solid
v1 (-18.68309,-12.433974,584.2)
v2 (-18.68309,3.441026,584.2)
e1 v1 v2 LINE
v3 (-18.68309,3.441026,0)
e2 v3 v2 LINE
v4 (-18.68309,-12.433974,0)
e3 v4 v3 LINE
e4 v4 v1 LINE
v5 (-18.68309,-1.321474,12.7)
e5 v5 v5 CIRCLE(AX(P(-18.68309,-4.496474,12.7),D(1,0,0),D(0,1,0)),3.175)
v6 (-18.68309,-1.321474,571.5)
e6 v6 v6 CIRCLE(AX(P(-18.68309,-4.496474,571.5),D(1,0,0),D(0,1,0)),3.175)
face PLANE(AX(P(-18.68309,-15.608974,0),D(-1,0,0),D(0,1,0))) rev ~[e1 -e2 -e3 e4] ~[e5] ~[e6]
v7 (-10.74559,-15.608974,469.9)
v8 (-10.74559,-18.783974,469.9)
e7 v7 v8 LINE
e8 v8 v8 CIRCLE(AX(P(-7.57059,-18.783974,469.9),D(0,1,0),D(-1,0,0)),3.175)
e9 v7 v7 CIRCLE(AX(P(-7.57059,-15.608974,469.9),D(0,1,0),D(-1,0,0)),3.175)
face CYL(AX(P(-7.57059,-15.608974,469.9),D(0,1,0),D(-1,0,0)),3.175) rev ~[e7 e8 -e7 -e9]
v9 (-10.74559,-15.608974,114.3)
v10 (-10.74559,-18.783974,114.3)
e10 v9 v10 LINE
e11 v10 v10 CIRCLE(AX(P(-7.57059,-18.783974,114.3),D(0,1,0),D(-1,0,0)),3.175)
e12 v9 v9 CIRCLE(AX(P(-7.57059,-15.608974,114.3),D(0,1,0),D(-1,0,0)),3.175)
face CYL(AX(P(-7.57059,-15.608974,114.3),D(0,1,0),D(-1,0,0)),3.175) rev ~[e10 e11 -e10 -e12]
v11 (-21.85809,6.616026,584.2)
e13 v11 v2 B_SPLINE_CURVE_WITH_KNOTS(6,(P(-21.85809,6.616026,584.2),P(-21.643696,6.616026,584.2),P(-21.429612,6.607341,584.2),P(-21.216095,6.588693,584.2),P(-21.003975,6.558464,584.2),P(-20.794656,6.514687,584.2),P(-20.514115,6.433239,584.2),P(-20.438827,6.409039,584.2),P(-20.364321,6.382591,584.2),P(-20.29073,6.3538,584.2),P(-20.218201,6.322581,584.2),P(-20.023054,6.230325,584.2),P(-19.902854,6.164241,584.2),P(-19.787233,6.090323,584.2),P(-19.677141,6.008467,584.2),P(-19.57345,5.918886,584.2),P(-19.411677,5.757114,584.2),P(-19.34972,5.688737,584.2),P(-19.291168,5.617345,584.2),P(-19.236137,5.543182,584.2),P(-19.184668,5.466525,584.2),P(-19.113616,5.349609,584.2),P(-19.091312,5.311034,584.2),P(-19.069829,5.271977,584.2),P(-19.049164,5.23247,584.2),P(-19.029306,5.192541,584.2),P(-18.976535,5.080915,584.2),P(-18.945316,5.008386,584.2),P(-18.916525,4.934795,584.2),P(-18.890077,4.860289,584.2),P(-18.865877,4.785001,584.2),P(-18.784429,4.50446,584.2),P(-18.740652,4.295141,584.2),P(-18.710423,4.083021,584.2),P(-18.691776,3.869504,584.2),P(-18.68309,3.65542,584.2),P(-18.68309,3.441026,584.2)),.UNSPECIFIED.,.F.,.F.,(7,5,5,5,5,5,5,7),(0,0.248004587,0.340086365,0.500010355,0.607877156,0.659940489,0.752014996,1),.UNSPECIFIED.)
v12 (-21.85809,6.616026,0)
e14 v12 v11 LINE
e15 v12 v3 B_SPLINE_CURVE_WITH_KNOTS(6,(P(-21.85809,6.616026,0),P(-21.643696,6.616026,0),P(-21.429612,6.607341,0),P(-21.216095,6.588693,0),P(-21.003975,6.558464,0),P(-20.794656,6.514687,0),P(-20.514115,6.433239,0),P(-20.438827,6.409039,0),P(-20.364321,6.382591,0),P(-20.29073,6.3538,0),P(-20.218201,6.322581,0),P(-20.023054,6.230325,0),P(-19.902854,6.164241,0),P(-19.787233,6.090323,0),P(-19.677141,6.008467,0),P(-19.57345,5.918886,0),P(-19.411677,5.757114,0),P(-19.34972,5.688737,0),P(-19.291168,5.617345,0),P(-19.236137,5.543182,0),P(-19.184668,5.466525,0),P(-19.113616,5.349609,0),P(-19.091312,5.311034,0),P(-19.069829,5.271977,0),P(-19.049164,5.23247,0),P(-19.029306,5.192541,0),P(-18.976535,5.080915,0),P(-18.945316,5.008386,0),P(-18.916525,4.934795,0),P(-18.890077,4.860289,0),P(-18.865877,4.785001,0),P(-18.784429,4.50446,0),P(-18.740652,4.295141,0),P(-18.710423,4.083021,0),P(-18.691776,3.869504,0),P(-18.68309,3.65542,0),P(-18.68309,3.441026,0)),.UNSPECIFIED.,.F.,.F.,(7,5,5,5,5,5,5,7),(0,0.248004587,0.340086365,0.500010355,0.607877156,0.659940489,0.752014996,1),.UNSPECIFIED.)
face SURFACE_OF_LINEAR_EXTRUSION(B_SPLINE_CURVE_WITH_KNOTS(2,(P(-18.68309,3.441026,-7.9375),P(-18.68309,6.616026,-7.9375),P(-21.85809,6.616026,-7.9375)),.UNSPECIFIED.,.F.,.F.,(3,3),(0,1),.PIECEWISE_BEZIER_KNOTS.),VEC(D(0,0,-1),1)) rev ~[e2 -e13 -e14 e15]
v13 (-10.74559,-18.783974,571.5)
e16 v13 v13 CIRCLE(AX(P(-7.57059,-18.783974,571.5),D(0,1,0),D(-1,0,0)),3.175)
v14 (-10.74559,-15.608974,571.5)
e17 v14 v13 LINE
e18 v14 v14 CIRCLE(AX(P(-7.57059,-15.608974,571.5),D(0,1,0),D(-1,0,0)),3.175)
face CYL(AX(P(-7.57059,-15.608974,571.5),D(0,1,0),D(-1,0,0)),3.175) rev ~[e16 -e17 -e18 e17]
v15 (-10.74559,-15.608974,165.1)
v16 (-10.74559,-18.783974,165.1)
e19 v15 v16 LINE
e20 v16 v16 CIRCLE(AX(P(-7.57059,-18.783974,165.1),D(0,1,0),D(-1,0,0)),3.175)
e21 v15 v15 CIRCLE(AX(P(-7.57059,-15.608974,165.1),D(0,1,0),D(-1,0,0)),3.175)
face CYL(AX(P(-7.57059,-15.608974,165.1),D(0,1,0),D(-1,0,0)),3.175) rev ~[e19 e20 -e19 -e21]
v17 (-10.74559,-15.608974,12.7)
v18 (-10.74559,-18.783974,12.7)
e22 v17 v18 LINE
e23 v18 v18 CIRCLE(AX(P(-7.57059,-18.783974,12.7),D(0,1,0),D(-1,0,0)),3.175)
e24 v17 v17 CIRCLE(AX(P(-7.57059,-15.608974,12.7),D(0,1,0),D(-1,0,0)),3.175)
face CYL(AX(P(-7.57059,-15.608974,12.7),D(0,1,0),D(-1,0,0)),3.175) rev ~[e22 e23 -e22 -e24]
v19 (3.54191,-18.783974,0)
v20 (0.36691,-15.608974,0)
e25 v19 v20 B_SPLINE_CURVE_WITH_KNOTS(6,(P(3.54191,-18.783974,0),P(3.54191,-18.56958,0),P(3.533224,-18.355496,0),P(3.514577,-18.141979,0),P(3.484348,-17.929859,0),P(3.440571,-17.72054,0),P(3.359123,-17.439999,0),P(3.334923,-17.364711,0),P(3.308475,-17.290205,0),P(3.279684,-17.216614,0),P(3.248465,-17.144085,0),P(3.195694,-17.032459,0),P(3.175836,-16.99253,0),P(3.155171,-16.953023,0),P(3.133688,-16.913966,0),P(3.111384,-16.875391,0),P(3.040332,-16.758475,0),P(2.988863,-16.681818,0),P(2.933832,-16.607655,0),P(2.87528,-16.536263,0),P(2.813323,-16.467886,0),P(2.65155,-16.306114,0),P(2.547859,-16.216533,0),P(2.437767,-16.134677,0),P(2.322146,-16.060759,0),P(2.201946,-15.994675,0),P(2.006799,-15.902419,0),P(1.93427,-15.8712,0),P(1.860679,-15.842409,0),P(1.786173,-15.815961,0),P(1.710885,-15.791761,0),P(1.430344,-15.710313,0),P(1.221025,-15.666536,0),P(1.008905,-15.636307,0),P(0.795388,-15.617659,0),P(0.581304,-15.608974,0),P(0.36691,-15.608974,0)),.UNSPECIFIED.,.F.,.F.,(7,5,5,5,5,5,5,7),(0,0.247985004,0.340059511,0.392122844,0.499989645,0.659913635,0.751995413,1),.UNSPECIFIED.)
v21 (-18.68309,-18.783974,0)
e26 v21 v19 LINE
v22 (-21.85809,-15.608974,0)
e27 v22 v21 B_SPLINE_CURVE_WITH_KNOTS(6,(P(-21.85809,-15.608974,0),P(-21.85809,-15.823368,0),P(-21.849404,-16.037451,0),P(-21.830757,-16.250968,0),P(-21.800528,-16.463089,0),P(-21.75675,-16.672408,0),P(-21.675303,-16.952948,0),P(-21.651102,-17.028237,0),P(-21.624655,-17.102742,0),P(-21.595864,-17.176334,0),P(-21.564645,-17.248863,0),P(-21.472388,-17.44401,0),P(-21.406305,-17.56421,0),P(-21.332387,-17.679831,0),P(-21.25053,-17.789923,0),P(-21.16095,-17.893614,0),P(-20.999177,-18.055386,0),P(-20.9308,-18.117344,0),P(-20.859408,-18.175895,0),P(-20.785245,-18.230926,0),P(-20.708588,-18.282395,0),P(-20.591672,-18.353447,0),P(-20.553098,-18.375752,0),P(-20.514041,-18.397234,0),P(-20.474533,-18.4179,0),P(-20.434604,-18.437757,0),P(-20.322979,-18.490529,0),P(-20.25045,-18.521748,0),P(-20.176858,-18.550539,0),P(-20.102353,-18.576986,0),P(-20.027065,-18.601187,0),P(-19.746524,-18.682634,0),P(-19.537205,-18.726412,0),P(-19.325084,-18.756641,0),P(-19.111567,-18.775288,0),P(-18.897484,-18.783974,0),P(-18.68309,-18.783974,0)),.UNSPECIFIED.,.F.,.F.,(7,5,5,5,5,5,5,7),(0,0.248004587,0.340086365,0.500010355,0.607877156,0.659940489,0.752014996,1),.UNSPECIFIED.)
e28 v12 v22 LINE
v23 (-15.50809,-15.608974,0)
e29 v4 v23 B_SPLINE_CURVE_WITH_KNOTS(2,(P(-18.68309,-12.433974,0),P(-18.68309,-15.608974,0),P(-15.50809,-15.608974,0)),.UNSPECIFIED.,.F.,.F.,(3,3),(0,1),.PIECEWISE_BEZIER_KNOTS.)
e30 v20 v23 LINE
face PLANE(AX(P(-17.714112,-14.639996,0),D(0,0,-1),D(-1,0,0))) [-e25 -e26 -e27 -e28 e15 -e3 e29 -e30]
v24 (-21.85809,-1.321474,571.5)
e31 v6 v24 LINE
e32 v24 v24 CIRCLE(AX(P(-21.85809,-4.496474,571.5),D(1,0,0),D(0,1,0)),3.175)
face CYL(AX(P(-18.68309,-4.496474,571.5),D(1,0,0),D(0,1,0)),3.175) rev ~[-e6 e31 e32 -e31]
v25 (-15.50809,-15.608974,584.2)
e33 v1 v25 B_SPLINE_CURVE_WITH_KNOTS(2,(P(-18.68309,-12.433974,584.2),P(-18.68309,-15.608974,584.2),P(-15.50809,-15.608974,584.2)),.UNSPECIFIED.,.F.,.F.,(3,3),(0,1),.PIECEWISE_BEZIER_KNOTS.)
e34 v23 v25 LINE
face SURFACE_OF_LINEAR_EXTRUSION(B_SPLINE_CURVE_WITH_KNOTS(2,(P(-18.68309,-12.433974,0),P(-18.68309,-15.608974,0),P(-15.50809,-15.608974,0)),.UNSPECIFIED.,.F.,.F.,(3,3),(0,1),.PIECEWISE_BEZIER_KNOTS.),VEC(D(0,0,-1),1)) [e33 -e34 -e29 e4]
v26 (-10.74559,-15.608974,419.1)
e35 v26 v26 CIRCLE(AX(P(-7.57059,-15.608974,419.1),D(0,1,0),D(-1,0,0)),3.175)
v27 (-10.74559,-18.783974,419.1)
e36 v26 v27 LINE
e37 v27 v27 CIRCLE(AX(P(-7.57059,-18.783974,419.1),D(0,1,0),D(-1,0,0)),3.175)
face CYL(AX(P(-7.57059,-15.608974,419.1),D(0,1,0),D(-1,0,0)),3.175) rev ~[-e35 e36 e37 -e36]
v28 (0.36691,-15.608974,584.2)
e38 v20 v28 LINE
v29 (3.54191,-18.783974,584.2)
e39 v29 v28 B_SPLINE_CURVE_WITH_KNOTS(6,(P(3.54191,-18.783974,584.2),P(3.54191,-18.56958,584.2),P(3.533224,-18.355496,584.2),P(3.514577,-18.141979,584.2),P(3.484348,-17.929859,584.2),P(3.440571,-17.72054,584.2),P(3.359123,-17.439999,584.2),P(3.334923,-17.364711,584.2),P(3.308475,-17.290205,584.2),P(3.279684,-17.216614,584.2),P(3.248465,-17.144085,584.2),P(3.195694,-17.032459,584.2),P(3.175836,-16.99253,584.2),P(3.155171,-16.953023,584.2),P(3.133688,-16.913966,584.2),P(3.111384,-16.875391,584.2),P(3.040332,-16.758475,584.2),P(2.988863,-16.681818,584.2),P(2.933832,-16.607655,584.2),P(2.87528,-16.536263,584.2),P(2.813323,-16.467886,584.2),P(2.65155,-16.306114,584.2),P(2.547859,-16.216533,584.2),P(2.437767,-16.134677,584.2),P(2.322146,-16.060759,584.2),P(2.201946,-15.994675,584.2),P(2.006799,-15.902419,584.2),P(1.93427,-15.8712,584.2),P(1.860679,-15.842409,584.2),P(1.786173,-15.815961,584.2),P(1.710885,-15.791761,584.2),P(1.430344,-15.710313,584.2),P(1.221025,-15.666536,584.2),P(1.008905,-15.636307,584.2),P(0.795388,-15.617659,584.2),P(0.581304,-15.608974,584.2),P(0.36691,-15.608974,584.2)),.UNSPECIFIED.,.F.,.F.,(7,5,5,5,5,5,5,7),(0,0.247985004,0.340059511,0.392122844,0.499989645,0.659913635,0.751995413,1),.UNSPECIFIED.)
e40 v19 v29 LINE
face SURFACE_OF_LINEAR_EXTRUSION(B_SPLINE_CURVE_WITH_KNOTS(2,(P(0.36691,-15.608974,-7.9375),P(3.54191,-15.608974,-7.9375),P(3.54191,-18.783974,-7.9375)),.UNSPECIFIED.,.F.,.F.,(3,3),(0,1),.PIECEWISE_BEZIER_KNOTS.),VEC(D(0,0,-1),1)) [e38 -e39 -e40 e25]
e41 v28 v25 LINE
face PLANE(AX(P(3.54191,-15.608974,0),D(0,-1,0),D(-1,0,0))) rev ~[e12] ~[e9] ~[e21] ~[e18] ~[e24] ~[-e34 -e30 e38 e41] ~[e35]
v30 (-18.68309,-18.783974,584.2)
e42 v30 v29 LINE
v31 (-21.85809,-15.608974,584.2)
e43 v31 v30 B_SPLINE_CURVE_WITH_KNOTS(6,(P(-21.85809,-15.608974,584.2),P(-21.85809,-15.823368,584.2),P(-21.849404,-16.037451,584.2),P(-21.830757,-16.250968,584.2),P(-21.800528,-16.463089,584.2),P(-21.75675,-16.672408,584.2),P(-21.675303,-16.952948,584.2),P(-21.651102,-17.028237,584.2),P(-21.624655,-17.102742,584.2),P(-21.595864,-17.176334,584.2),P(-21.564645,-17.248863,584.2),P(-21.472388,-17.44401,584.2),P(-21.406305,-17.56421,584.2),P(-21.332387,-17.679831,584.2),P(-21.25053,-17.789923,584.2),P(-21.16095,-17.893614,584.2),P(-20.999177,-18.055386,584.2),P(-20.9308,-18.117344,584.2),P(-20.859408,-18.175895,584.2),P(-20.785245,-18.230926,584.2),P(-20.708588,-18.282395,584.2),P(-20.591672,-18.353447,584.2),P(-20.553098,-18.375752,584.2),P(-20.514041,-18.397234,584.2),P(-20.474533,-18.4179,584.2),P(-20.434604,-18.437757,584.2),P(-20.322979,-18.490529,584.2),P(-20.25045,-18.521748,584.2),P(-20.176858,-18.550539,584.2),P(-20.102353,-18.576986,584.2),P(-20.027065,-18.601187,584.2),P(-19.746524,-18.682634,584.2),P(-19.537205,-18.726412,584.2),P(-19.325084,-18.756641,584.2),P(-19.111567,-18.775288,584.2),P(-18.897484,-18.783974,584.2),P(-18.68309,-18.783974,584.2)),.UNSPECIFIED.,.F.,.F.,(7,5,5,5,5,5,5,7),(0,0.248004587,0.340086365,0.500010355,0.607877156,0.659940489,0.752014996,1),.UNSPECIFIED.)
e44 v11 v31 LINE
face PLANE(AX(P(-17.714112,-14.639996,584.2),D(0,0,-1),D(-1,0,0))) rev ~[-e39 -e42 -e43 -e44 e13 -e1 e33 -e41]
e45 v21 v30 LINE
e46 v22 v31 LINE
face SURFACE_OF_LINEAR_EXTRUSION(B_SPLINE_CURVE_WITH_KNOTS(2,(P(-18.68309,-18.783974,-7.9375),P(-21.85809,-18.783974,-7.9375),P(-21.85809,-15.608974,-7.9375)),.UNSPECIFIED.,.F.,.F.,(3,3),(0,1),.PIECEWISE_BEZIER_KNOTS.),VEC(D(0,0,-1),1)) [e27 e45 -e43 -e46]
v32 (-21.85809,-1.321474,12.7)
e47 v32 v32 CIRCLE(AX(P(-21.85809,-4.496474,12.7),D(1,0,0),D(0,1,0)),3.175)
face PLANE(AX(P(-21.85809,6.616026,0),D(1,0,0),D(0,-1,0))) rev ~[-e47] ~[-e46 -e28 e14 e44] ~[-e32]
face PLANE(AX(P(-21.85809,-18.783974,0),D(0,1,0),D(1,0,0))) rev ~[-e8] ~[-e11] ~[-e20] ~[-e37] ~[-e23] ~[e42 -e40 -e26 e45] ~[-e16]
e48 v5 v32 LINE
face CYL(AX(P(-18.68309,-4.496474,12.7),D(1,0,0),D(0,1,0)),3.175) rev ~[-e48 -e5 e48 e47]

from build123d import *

# Parameters (mm, degrees)
F1_DEPTH    = 584.2
F2_R        = 3.175
F3_DEPTH    = 3.175
F4_R        = 3.175
F5_DEPTH    = 25.4
F6_T1_DEPTH = 600.075
F7_T1_DEPTH = 584.2
F7_T3_DEPTH = 600.075
F8_R        = 3.175
F9_DEPTH    = 3.175


# Not quite as in the source:
# - a fillet or chamfer that OpenCascade refuses, or shapes differently, is made with other operations: its cross-section is extruded or revolved along the edge and cut away or added


with BuildPart() as f1:
    # F0 (on Top) → F1 (new body)
    with BuildSketch(Plane.XY):
        Polygon((-18.6830897415, 6.6160263166), (-21.8580897415, 6.6160263166), (-21.8580897415, -18.7839736834), (3.5419102585, -18.7839736834), (3.5419102585, -15.6089736834), (-18.6830897415, -15.6089736834), align=None)
    extrude(amount=F1_DEPTH)

    # F2 (on face) → F3 (cut)
    with BuildSketch(Plane.YZ.offset(-18.6830897415)):
        with Locations((-4.4964736834, 571.5)):
            Circle(F2_R)
        with Locations((-4.4964736834, 12.7)):
            Circle(F2_R)
    extrude(amount=-F3_DEPTH, mode=Mode.SUBTRACT)

    # F4 (on face) → F5 (cut)
    with BuildSketch(Plane(origin=(0, -15.6089736834, 0), x_dir=(-1, 0, 0), z_dir=(0, 1, 0))):
        with Locations((7.5705897415, 12.7)):
            Circle(F4_R)
        with Locations((7.5705897415, 571.5)):
            Circle(F4_R)
    extrude(amount=-F5_DEPTH, mode=Mode.SUBTRACT)

    # F6: fillet of radius 3.175 on 2 edges, made by hand

    # F6_s2 → F6_t1 (cut)
    with BuildSketch(Plane.XY.offset(-7.9375)):
        with BuildLine():
            add(Edge.make_bspline(
                [(0.3669102585, -15.6089736834), (3.5419102585, -15.6089736834), (3.5419102585, -18.7839736834)],
                knots=[0, 0, 0, 1, 1, 1], degree=2, weights=[1, 1, 1]))
            Line((3.5419102585, -18.7839736834), (3.5419102585, -15.6089736834))
            Line((3.5419102585, -15.6089736834), (0.3669102585, -15.6089736834))
        make_face()
        with BuildLine():
            add(Edge.make_bspline(
                [(-18.6830897415, 3.4410263166), (-18.6830897415, 6.6160263166), (-21.8580897415, 6.6160263166)],
                knots=[0, 0, 0, 1, 1, 1], degree=2, weights=[1, 1, 1]))
            Line((-21.8580897415, 6.6160263166), (-18.6830897415, 6.6160263166))
            Line((-18.6830897415, 6.6160263166), (-18.6830897415, 3.4410263166))
        make_face()
    extrude(amount=F6_T1_DEPTH, mode=Mode.SUBTRACT)

    # F7: fillet of radius 3.175 on 2 edges, made by hand

    # F7_s2 → F7_t1 (join)
    with BuildSketch(Plane.XY):
        with BuildLine():
            add(Edge.make_bspline(
                [(-18.6830897415, -12.4339736834), (-18.6830897415, -15.6089736834), (-15.5080897415, -15.6089736834)],
                knots=[0, 0, 0, 1, 1, 1], degree=2, weights=[1, 1, 1]))
            Line((-15.5080897415, -15.6089736834), (-18.6830897415, -15.6089736834))
            Line((-18.6830897415, -15.6089736834), (-18.6830897415, -12.4339736834))
        make_face()
    extrude(amount=F7_T1_DEPTH)

    # F7_s4 → F7_t3 (cut)
    with BuildSketch(Plane.XY.offset(-7.9375)):
        with BuildLine():
            add(Edge.make_bspline(
                [(-18.6830897415, -18.7839736834), (-21.8580897415, -18.7839736834), (-21.8580897415, -15.6089736834)],
                knots=[0, 0, 0, 1, 1, 1], degree=2, weights=[1, 1, 1]))
            Line((-21.8580897415, -15.6089736834), (-21.8580897415, -18.7839736834))
            Line((-21.8580897415, -18.7839736834), (-18.6830897415, -18.7839736834))
        make_face()
    extrude(amount=F7_T3_DEPTH, mode=Mode.SUBTRACT)

    # F8 (on face) → F9 (cut)
    with BuildSketch(Plane(origin=(0, -15.6089736834, 0), x_dir=(-1, 0, 0), z_dir=(0, 1, 0))):
        with Locations((7.5705897415, 165.1)):
            Circle(F8_R)
        with Locations((7.5705897415, 114.3)):
            Circle(F8_R)
        with Locations((7.5705897415, 469.9)):
            Circle(F8_R)
        with Locations((7.5705897415, 419.1)):
            Circle(F8_R)
    extrude(amount=-F9_DEPTH, mode=Mode.SUBTRACT)


solid = f1.part
